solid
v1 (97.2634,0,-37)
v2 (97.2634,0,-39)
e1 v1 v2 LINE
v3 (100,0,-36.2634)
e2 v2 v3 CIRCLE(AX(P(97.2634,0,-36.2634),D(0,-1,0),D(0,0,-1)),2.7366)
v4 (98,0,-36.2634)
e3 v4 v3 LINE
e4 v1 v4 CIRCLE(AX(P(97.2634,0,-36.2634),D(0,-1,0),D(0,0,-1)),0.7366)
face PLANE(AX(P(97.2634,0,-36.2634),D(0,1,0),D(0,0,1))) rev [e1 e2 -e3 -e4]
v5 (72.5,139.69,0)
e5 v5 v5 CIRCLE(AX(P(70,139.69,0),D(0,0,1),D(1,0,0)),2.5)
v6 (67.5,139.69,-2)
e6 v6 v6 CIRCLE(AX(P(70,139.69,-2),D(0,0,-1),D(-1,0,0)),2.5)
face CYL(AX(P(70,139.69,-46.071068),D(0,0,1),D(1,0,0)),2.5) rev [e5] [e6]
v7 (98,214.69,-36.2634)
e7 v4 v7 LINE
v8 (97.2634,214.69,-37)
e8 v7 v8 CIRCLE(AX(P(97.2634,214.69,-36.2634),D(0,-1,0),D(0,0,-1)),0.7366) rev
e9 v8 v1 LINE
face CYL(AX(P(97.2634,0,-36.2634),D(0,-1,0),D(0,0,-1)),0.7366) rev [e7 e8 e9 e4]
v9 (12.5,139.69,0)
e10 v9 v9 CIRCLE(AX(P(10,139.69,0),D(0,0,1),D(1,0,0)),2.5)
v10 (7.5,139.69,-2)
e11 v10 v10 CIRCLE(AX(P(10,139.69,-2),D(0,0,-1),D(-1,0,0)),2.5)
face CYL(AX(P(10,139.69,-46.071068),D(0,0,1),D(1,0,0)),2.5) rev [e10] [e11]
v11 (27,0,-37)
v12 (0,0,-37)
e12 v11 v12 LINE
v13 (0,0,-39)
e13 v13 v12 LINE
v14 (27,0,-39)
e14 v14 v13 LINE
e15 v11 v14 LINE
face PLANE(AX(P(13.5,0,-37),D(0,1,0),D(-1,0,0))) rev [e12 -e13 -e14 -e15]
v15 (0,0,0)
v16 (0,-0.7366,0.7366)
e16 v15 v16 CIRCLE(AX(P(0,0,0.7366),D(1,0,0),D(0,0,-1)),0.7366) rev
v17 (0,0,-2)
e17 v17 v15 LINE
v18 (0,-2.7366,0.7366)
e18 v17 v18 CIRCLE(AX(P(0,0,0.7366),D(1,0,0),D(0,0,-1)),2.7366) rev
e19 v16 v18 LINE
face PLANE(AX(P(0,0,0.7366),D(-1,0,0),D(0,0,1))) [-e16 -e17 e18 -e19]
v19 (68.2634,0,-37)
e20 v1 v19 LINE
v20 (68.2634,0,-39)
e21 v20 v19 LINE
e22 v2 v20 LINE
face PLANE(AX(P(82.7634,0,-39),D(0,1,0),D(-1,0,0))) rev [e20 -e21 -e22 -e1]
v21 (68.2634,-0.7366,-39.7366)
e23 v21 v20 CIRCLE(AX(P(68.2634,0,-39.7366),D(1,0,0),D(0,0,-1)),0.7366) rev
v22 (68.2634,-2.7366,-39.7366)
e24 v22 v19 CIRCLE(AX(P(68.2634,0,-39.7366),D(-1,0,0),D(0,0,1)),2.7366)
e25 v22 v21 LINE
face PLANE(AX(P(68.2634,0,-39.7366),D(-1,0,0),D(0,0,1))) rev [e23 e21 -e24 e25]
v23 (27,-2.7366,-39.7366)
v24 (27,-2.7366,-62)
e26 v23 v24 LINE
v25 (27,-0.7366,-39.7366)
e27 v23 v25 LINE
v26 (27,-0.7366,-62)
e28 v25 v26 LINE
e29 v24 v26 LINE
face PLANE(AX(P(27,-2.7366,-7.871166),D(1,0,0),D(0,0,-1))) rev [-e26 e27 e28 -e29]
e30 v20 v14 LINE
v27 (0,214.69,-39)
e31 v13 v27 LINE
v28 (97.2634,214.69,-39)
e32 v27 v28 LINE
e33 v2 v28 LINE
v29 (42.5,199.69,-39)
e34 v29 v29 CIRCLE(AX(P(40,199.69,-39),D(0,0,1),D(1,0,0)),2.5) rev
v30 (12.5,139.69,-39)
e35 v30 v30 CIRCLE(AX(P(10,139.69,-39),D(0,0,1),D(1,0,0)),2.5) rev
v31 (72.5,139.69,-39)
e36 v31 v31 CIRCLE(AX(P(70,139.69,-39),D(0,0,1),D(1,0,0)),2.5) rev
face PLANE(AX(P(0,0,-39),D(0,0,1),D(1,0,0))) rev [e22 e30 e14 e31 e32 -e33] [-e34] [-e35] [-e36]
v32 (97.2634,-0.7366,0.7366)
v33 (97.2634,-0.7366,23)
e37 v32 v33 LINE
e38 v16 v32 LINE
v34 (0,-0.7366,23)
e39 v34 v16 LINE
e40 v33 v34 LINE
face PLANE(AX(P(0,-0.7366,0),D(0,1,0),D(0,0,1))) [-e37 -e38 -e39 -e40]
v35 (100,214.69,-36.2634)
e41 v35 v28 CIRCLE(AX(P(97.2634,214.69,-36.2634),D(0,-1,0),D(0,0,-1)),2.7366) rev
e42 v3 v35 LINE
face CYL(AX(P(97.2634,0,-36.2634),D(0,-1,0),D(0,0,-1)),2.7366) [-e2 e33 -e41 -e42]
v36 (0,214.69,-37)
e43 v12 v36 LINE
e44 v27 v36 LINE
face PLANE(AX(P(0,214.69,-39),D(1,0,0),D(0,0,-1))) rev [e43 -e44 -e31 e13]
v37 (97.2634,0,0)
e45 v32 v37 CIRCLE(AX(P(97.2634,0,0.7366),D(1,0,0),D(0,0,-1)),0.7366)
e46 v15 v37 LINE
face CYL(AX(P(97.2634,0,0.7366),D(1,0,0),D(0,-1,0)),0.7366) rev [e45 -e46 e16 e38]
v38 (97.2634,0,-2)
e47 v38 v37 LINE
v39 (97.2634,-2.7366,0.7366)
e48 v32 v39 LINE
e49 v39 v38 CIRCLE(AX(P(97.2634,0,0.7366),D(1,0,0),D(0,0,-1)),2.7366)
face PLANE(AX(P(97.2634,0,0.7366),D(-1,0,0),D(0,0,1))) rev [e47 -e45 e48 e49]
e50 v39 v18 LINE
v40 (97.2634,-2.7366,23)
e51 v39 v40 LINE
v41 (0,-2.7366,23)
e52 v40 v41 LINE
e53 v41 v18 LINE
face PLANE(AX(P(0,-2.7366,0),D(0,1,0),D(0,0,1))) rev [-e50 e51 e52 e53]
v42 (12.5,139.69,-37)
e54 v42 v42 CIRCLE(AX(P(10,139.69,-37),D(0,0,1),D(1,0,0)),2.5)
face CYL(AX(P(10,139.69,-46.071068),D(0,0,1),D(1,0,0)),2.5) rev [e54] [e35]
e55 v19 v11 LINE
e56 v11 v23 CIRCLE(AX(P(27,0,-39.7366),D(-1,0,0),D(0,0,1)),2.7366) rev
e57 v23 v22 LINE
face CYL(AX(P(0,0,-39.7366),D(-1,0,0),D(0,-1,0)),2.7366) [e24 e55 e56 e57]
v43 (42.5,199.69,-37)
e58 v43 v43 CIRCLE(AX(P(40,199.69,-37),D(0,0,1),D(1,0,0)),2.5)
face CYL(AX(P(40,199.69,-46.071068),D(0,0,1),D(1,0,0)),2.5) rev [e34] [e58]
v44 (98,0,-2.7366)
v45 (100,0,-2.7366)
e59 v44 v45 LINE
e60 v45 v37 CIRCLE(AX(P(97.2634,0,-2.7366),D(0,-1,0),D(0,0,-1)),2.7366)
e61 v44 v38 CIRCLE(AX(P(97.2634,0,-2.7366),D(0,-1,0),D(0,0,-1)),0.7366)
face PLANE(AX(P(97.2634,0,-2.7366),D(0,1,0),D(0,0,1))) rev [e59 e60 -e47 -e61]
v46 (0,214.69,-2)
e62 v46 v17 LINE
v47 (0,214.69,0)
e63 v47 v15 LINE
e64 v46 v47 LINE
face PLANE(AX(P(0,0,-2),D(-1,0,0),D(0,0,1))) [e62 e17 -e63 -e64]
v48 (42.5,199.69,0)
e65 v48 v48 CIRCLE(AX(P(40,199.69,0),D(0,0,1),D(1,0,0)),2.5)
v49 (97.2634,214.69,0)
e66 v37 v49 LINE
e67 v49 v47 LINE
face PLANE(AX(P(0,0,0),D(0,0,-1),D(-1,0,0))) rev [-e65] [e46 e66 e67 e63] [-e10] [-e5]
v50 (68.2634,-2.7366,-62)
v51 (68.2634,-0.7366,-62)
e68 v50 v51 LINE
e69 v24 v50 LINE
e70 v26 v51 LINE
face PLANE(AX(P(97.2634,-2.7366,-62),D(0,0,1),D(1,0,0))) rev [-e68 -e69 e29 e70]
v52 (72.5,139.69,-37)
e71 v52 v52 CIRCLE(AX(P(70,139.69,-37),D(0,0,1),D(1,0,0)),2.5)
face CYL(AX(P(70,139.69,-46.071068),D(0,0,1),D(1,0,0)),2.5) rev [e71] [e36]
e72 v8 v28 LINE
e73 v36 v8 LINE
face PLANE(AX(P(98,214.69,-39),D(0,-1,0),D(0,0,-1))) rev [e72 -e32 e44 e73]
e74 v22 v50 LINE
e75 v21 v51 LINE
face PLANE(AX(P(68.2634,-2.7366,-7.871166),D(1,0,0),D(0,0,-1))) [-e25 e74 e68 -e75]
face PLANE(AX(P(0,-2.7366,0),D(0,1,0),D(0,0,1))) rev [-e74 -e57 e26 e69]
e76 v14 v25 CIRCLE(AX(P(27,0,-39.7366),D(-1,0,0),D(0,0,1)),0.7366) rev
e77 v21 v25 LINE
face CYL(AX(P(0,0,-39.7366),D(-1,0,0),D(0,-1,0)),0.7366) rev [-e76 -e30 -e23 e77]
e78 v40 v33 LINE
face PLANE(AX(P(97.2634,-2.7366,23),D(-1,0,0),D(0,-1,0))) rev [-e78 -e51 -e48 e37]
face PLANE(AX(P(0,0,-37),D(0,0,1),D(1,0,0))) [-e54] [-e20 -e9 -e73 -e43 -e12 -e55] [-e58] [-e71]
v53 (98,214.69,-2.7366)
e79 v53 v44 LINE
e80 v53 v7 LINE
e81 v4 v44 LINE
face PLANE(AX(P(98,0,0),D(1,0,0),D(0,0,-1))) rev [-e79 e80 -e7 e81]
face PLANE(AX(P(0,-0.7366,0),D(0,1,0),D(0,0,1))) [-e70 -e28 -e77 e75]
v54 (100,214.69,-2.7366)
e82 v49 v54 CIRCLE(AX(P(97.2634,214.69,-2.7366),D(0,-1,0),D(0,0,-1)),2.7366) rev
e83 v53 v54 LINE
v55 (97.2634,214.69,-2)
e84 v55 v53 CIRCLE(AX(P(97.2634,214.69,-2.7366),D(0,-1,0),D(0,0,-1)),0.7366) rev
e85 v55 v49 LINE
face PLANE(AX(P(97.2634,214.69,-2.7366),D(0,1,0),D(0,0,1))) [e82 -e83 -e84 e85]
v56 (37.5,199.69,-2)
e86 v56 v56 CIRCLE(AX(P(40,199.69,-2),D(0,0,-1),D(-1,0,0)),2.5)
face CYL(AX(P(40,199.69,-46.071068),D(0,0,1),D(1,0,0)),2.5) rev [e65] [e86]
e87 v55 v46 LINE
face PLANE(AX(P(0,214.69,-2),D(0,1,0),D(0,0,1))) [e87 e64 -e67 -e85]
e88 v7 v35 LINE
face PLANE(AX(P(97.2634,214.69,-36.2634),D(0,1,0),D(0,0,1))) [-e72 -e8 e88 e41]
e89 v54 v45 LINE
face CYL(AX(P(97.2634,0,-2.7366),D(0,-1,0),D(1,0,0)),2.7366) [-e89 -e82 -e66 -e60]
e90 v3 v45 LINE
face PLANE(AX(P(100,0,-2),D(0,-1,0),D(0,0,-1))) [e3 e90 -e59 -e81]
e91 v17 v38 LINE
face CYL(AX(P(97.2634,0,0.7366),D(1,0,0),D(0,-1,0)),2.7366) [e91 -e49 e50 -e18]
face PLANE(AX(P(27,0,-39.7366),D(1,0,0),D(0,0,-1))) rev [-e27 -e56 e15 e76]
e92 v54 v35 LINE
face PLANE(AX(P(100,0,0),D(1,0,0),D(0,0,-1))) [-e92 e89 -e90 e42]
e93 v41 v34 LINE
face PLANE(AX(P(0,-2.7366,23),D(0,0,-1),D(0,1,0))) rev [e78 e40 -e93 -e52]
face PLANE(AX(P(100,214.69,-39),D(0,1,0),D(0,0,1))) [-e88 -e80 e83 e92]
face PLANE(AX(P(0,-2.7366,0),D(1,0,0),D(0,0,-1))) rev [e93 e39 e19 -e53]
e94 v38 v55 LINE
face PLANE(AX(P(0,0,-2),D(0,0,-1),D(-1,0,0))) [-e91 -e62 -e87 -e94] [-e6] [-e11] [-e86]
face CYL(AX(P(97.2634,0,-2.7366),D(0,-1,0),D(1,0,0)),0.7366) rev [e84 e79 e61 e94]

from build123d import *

# Parameters (mm, degrees)
SKETCH1_W                    = 100
SKETCH1_H                    = 214.69
BASE_FLANGE1_DEPTH           = 2
EDGE_FLANGE1_STRIP_W         = 9.4732
EDGE_FLANGE1_STRIP_H         = 2
EDGE_FLANGE1_STRIP_CUT_DEPTH = 214.69
EDGE_FLANGE1_DEPTH           = 214.69
EDGE_FLANGE2_STRIP_W         = 9.4732
EDGE_FLANGE2_STRIP_H         = 2
EDGE_FLANGE2_STRIP_CUT_DEPTH = 214.69
EDGE_FLANGE2_DEPTH           = 214.69
EDGE_FLANGE3_DEPTH           = 97.2634
EDGE_FLANGE3_BEND_DEPTH      = 97.2634
SKETCH18_W                   = 29
SKETCH18_H                   = 2.7366
SKETCH18_W_2                 = 27
CUT_EXTRUDE1_DEPTH           = 25
CUT_EXTRUDE2_REACH           = 246.818
SKETCH19_R                   = 2.5


# Sheet-metal steps are written as plain solids
with BuildPart() as part:
    # Sketch1 → Base-Flange1 (new body)
    with BuildSketch(Plane.XY):
        with Locations((50, 107.345)):
            Rectangle(SKETCH1_W, SKETCH1_H)
    extrude(amount=-BASE_FLANGE1_DEPTH)

    # Edge-Flange1 strip (across the edge) → Edge-Flange1 strip cut (cut)
    with BuildSketch(Plane(origin=(100, 214.69, -2), x_dir=(-1, 0, 0), z_dir=(0, -1, 0))):
        with Locations((-2, -1)):
            Rectangle(EDGE_FLANGE1_STRIP_W, EDGE_FLANGE1_STRIP_H)
    extrude(amount=EDGE_FLANGE1_STRIP_CUT_DEPTH, mode=Mode.SUBTRACT)

    # Edge-Flange1 section (across the edge) → Edge-Flange1 (add)
    with BuildSketch(Plane(origin=(100, 214.69, -2), x_dir=(-1, 0, 0), z_dir=(0, -1, 0))):
        with BuildLine():
            Line((0, 0.7366), (0, 37))
            Line((0, 37), (2, 37))
            Line((2, 37), (2, 0.7366))
            ThreePointArc((2, 0.7366), (2.215745145, 0.215745145), (2.7366, 0))
            Line((2.7366, 0), (2.7366, -2))
            ThreePointArc((2.7366, -2), (0.801531583, -1.198468417), (0, 0.7366))
        make_face()
    extrude(amount=EDGE_FLANGE1_DEPTH)

    # Edge-Flange2 strip (across the edge) → Edge-Flange2 strip cut (cut)
    with BuildSketch(Plane(origin=(98, 214.69, -39), x_dir=(0, 0, 1), z_dir=(0, -1, 0))):
        with Locations((-2, -1)):
            Rectangle(EDGE_FLANGE2_STRIP_W, EDGE_FLANGE2_STRIP_H)
    extrude(amount=EDGE_FLANGE2_STRIP_CUT_DEPTH, mode=Mode.SUBTRACT)

    # Edge-Flange2 section (across the edge) → Edge-Flange2 (add)
    with BuildSketch(Plane(origin=(98, 214.69, -39), x_dir=(0, 0, 1), z_dir=(0, -1, 0))):
        with BuildLine():
            Line((0, 0.7366), (0, 98))
            Line((0, 98), (2, 98))
            Line((2, 98), (2, 0.7366))
            ThreePointArc((2, 0.7366), (2.215745145, 0.215745145), (2.7366, 0))
            Line((2.7366, 0), (2.7366, -2))
            ThreePointArc((2.7366, -2), (0.801531583, -1.198468417), (0, 0.7366))
        make_face()
    extrude(amount=EDGE_FLANGE2_DEPTH)

    # Edge-Flange3 section (across the edge) → Edge-Flange3 (add)
    with BuildSketch(Plane(origin=(0, -0.7366, 0), x_dir=(0, 1, 0), z_dir=(1, 0, 0))):
        with BuildLine():
            Line((-2, 0.7366), (-2, 23))
            Line((-2, 23), (0, 23))
            Line((0, 23), (0, 0.7366))
            ThreePointArc((0, 0.7366), (0.215745145, 0.215745145), (0.7366, 0))
            Line((0.7366, 0), (0.7366, -2))
            ThreePointArc((0.7366, -2), (-1.198468417, -1.198468417), (-2, 0.7366))
        make_face()
    extrude(amount=EDGE_FLANGE3_DEPTH)

    # Edge-Flange3 section 2 (across the edge) → Edge-Flange3 bend (add)
    with BuildSketch(Plane(origin=(97.2634, -0.7366, -39), x_dir=(0, 1, 0), z_dir=(-1, 0, 0))):
        with BuildLine():
            Line((-2, 0.7366), (-2, 23))
            Line((-2, 23), (0, 23))
            Line((0, 23), (0, 0.7366))
            ThreePointArc((0, 0.7366), (0.215745145, 0.215745145), (0.7366, 0))
            Line((0.7366, 0), (0.7366, -2))
            ThreePointArc((0.7366, -2), (-1.198468417, -1.198468417), (-2, 0.7366))
        make_face()
    extrude(amount=EDGE_FLANGE3_BEND_DEPTH)

    # Sketch18 → Cut-Extrude1 (cut)
    with BuildSketch(Plane(origin=(0, -57.7366, -62), x_dir=(1, 0, 0), z_dir=(0, 0, 1))):
        with Locations((82.7634, 56.3683)):
            Rectangle(SKETCH18_W, SKETCH18_H)
        with Locations((13.5, 56.3683)):
            Rectangle(SKETCH18_W_2, SKETCH18_H)
    extrude(amount=CUT_EXTRUDE1_DEPTH, mode=Mode.SUBTRACT)

    # Cut-Extrude2: up to this face of the body (flat: up to its plane)
    cut_extrude2_end = Plane(part.part.faces().sort_by_distance((48.6317, 107.345, -39))[0])
    # Sketch19 → Cut-Extrude2 (cut, up to the picked face)
    with BuildSketch(Plane.XY, mode=Mode.PRIVATE) as cut_extrude2_sk1:
        with Locations((40, 199.69)):
            Circle(SKETCH19_R)
    cut_extrude2_tool1 = split(extrude(cut_extrude2_sk1.sketch, amount=-CUT_EXTRUDE2_REACH, mode=Mode.PRIVATE), bisect_by=cut_extrude2_end, keep=Keep.BOTH, mode=Mode.PRIVATE)
    # Sketch19 → Cut-Extrude2 (cut, up to the picked face)
    with BuildSketch(Plane.XY, mode=Mode.PRIVATE) as cut_extrude2_sk2:
        with Locations((10, 139.69)):
            Circle(SKETCH19_R)
    cut_extrude2_tool2 = split(extrude(cut_extrude2_sk2.sketch, amount=-CUT_EXTRUDE2_REACH, mode=Mode.PRIVATE), bisect_by=cut_extrude2_end, keep=Keep.BOTH, mode=Mode.PRIVATE)
    # Sketch19 → Cut-Extrude2 (cut, up to the picked face)
    with BuildSketch(Plane.XY, mode=Mode.PRIVATE) as cut_extrude2_sk3:
        with Locations((70, 139.69)):
            Circle(SKETCH19_R)
    cut_extrude2_tool3 = split(extrude(cut_extrude2_sk3.sketch, amount=-CUT_EXTRUDE2_REACH, mode=Mode.PRIVATE), bisect_by=cut_extrude2_end, keep=Keep.BOTH, mode=Mode.PRIVATE)
    add(cut_extrude2_tool1.solids().sort_by(Axis((40, 199.69, 0), (0, 0, -1)))[0], mode=Mode.SUBTRACT)
    add(cut_extrude2_tool2.solids().sort_by(Axis((10, 139.69, 0), (0, 0, -1)))[0], mode=Mode.SUBTRACT)
    add(cut_extrude2_tool3.solids().sort_by(Axis((70, 139.69, 0), (0, 0, -1)))[0], mode=Mode.SUBTRACT)


solid = part.part
